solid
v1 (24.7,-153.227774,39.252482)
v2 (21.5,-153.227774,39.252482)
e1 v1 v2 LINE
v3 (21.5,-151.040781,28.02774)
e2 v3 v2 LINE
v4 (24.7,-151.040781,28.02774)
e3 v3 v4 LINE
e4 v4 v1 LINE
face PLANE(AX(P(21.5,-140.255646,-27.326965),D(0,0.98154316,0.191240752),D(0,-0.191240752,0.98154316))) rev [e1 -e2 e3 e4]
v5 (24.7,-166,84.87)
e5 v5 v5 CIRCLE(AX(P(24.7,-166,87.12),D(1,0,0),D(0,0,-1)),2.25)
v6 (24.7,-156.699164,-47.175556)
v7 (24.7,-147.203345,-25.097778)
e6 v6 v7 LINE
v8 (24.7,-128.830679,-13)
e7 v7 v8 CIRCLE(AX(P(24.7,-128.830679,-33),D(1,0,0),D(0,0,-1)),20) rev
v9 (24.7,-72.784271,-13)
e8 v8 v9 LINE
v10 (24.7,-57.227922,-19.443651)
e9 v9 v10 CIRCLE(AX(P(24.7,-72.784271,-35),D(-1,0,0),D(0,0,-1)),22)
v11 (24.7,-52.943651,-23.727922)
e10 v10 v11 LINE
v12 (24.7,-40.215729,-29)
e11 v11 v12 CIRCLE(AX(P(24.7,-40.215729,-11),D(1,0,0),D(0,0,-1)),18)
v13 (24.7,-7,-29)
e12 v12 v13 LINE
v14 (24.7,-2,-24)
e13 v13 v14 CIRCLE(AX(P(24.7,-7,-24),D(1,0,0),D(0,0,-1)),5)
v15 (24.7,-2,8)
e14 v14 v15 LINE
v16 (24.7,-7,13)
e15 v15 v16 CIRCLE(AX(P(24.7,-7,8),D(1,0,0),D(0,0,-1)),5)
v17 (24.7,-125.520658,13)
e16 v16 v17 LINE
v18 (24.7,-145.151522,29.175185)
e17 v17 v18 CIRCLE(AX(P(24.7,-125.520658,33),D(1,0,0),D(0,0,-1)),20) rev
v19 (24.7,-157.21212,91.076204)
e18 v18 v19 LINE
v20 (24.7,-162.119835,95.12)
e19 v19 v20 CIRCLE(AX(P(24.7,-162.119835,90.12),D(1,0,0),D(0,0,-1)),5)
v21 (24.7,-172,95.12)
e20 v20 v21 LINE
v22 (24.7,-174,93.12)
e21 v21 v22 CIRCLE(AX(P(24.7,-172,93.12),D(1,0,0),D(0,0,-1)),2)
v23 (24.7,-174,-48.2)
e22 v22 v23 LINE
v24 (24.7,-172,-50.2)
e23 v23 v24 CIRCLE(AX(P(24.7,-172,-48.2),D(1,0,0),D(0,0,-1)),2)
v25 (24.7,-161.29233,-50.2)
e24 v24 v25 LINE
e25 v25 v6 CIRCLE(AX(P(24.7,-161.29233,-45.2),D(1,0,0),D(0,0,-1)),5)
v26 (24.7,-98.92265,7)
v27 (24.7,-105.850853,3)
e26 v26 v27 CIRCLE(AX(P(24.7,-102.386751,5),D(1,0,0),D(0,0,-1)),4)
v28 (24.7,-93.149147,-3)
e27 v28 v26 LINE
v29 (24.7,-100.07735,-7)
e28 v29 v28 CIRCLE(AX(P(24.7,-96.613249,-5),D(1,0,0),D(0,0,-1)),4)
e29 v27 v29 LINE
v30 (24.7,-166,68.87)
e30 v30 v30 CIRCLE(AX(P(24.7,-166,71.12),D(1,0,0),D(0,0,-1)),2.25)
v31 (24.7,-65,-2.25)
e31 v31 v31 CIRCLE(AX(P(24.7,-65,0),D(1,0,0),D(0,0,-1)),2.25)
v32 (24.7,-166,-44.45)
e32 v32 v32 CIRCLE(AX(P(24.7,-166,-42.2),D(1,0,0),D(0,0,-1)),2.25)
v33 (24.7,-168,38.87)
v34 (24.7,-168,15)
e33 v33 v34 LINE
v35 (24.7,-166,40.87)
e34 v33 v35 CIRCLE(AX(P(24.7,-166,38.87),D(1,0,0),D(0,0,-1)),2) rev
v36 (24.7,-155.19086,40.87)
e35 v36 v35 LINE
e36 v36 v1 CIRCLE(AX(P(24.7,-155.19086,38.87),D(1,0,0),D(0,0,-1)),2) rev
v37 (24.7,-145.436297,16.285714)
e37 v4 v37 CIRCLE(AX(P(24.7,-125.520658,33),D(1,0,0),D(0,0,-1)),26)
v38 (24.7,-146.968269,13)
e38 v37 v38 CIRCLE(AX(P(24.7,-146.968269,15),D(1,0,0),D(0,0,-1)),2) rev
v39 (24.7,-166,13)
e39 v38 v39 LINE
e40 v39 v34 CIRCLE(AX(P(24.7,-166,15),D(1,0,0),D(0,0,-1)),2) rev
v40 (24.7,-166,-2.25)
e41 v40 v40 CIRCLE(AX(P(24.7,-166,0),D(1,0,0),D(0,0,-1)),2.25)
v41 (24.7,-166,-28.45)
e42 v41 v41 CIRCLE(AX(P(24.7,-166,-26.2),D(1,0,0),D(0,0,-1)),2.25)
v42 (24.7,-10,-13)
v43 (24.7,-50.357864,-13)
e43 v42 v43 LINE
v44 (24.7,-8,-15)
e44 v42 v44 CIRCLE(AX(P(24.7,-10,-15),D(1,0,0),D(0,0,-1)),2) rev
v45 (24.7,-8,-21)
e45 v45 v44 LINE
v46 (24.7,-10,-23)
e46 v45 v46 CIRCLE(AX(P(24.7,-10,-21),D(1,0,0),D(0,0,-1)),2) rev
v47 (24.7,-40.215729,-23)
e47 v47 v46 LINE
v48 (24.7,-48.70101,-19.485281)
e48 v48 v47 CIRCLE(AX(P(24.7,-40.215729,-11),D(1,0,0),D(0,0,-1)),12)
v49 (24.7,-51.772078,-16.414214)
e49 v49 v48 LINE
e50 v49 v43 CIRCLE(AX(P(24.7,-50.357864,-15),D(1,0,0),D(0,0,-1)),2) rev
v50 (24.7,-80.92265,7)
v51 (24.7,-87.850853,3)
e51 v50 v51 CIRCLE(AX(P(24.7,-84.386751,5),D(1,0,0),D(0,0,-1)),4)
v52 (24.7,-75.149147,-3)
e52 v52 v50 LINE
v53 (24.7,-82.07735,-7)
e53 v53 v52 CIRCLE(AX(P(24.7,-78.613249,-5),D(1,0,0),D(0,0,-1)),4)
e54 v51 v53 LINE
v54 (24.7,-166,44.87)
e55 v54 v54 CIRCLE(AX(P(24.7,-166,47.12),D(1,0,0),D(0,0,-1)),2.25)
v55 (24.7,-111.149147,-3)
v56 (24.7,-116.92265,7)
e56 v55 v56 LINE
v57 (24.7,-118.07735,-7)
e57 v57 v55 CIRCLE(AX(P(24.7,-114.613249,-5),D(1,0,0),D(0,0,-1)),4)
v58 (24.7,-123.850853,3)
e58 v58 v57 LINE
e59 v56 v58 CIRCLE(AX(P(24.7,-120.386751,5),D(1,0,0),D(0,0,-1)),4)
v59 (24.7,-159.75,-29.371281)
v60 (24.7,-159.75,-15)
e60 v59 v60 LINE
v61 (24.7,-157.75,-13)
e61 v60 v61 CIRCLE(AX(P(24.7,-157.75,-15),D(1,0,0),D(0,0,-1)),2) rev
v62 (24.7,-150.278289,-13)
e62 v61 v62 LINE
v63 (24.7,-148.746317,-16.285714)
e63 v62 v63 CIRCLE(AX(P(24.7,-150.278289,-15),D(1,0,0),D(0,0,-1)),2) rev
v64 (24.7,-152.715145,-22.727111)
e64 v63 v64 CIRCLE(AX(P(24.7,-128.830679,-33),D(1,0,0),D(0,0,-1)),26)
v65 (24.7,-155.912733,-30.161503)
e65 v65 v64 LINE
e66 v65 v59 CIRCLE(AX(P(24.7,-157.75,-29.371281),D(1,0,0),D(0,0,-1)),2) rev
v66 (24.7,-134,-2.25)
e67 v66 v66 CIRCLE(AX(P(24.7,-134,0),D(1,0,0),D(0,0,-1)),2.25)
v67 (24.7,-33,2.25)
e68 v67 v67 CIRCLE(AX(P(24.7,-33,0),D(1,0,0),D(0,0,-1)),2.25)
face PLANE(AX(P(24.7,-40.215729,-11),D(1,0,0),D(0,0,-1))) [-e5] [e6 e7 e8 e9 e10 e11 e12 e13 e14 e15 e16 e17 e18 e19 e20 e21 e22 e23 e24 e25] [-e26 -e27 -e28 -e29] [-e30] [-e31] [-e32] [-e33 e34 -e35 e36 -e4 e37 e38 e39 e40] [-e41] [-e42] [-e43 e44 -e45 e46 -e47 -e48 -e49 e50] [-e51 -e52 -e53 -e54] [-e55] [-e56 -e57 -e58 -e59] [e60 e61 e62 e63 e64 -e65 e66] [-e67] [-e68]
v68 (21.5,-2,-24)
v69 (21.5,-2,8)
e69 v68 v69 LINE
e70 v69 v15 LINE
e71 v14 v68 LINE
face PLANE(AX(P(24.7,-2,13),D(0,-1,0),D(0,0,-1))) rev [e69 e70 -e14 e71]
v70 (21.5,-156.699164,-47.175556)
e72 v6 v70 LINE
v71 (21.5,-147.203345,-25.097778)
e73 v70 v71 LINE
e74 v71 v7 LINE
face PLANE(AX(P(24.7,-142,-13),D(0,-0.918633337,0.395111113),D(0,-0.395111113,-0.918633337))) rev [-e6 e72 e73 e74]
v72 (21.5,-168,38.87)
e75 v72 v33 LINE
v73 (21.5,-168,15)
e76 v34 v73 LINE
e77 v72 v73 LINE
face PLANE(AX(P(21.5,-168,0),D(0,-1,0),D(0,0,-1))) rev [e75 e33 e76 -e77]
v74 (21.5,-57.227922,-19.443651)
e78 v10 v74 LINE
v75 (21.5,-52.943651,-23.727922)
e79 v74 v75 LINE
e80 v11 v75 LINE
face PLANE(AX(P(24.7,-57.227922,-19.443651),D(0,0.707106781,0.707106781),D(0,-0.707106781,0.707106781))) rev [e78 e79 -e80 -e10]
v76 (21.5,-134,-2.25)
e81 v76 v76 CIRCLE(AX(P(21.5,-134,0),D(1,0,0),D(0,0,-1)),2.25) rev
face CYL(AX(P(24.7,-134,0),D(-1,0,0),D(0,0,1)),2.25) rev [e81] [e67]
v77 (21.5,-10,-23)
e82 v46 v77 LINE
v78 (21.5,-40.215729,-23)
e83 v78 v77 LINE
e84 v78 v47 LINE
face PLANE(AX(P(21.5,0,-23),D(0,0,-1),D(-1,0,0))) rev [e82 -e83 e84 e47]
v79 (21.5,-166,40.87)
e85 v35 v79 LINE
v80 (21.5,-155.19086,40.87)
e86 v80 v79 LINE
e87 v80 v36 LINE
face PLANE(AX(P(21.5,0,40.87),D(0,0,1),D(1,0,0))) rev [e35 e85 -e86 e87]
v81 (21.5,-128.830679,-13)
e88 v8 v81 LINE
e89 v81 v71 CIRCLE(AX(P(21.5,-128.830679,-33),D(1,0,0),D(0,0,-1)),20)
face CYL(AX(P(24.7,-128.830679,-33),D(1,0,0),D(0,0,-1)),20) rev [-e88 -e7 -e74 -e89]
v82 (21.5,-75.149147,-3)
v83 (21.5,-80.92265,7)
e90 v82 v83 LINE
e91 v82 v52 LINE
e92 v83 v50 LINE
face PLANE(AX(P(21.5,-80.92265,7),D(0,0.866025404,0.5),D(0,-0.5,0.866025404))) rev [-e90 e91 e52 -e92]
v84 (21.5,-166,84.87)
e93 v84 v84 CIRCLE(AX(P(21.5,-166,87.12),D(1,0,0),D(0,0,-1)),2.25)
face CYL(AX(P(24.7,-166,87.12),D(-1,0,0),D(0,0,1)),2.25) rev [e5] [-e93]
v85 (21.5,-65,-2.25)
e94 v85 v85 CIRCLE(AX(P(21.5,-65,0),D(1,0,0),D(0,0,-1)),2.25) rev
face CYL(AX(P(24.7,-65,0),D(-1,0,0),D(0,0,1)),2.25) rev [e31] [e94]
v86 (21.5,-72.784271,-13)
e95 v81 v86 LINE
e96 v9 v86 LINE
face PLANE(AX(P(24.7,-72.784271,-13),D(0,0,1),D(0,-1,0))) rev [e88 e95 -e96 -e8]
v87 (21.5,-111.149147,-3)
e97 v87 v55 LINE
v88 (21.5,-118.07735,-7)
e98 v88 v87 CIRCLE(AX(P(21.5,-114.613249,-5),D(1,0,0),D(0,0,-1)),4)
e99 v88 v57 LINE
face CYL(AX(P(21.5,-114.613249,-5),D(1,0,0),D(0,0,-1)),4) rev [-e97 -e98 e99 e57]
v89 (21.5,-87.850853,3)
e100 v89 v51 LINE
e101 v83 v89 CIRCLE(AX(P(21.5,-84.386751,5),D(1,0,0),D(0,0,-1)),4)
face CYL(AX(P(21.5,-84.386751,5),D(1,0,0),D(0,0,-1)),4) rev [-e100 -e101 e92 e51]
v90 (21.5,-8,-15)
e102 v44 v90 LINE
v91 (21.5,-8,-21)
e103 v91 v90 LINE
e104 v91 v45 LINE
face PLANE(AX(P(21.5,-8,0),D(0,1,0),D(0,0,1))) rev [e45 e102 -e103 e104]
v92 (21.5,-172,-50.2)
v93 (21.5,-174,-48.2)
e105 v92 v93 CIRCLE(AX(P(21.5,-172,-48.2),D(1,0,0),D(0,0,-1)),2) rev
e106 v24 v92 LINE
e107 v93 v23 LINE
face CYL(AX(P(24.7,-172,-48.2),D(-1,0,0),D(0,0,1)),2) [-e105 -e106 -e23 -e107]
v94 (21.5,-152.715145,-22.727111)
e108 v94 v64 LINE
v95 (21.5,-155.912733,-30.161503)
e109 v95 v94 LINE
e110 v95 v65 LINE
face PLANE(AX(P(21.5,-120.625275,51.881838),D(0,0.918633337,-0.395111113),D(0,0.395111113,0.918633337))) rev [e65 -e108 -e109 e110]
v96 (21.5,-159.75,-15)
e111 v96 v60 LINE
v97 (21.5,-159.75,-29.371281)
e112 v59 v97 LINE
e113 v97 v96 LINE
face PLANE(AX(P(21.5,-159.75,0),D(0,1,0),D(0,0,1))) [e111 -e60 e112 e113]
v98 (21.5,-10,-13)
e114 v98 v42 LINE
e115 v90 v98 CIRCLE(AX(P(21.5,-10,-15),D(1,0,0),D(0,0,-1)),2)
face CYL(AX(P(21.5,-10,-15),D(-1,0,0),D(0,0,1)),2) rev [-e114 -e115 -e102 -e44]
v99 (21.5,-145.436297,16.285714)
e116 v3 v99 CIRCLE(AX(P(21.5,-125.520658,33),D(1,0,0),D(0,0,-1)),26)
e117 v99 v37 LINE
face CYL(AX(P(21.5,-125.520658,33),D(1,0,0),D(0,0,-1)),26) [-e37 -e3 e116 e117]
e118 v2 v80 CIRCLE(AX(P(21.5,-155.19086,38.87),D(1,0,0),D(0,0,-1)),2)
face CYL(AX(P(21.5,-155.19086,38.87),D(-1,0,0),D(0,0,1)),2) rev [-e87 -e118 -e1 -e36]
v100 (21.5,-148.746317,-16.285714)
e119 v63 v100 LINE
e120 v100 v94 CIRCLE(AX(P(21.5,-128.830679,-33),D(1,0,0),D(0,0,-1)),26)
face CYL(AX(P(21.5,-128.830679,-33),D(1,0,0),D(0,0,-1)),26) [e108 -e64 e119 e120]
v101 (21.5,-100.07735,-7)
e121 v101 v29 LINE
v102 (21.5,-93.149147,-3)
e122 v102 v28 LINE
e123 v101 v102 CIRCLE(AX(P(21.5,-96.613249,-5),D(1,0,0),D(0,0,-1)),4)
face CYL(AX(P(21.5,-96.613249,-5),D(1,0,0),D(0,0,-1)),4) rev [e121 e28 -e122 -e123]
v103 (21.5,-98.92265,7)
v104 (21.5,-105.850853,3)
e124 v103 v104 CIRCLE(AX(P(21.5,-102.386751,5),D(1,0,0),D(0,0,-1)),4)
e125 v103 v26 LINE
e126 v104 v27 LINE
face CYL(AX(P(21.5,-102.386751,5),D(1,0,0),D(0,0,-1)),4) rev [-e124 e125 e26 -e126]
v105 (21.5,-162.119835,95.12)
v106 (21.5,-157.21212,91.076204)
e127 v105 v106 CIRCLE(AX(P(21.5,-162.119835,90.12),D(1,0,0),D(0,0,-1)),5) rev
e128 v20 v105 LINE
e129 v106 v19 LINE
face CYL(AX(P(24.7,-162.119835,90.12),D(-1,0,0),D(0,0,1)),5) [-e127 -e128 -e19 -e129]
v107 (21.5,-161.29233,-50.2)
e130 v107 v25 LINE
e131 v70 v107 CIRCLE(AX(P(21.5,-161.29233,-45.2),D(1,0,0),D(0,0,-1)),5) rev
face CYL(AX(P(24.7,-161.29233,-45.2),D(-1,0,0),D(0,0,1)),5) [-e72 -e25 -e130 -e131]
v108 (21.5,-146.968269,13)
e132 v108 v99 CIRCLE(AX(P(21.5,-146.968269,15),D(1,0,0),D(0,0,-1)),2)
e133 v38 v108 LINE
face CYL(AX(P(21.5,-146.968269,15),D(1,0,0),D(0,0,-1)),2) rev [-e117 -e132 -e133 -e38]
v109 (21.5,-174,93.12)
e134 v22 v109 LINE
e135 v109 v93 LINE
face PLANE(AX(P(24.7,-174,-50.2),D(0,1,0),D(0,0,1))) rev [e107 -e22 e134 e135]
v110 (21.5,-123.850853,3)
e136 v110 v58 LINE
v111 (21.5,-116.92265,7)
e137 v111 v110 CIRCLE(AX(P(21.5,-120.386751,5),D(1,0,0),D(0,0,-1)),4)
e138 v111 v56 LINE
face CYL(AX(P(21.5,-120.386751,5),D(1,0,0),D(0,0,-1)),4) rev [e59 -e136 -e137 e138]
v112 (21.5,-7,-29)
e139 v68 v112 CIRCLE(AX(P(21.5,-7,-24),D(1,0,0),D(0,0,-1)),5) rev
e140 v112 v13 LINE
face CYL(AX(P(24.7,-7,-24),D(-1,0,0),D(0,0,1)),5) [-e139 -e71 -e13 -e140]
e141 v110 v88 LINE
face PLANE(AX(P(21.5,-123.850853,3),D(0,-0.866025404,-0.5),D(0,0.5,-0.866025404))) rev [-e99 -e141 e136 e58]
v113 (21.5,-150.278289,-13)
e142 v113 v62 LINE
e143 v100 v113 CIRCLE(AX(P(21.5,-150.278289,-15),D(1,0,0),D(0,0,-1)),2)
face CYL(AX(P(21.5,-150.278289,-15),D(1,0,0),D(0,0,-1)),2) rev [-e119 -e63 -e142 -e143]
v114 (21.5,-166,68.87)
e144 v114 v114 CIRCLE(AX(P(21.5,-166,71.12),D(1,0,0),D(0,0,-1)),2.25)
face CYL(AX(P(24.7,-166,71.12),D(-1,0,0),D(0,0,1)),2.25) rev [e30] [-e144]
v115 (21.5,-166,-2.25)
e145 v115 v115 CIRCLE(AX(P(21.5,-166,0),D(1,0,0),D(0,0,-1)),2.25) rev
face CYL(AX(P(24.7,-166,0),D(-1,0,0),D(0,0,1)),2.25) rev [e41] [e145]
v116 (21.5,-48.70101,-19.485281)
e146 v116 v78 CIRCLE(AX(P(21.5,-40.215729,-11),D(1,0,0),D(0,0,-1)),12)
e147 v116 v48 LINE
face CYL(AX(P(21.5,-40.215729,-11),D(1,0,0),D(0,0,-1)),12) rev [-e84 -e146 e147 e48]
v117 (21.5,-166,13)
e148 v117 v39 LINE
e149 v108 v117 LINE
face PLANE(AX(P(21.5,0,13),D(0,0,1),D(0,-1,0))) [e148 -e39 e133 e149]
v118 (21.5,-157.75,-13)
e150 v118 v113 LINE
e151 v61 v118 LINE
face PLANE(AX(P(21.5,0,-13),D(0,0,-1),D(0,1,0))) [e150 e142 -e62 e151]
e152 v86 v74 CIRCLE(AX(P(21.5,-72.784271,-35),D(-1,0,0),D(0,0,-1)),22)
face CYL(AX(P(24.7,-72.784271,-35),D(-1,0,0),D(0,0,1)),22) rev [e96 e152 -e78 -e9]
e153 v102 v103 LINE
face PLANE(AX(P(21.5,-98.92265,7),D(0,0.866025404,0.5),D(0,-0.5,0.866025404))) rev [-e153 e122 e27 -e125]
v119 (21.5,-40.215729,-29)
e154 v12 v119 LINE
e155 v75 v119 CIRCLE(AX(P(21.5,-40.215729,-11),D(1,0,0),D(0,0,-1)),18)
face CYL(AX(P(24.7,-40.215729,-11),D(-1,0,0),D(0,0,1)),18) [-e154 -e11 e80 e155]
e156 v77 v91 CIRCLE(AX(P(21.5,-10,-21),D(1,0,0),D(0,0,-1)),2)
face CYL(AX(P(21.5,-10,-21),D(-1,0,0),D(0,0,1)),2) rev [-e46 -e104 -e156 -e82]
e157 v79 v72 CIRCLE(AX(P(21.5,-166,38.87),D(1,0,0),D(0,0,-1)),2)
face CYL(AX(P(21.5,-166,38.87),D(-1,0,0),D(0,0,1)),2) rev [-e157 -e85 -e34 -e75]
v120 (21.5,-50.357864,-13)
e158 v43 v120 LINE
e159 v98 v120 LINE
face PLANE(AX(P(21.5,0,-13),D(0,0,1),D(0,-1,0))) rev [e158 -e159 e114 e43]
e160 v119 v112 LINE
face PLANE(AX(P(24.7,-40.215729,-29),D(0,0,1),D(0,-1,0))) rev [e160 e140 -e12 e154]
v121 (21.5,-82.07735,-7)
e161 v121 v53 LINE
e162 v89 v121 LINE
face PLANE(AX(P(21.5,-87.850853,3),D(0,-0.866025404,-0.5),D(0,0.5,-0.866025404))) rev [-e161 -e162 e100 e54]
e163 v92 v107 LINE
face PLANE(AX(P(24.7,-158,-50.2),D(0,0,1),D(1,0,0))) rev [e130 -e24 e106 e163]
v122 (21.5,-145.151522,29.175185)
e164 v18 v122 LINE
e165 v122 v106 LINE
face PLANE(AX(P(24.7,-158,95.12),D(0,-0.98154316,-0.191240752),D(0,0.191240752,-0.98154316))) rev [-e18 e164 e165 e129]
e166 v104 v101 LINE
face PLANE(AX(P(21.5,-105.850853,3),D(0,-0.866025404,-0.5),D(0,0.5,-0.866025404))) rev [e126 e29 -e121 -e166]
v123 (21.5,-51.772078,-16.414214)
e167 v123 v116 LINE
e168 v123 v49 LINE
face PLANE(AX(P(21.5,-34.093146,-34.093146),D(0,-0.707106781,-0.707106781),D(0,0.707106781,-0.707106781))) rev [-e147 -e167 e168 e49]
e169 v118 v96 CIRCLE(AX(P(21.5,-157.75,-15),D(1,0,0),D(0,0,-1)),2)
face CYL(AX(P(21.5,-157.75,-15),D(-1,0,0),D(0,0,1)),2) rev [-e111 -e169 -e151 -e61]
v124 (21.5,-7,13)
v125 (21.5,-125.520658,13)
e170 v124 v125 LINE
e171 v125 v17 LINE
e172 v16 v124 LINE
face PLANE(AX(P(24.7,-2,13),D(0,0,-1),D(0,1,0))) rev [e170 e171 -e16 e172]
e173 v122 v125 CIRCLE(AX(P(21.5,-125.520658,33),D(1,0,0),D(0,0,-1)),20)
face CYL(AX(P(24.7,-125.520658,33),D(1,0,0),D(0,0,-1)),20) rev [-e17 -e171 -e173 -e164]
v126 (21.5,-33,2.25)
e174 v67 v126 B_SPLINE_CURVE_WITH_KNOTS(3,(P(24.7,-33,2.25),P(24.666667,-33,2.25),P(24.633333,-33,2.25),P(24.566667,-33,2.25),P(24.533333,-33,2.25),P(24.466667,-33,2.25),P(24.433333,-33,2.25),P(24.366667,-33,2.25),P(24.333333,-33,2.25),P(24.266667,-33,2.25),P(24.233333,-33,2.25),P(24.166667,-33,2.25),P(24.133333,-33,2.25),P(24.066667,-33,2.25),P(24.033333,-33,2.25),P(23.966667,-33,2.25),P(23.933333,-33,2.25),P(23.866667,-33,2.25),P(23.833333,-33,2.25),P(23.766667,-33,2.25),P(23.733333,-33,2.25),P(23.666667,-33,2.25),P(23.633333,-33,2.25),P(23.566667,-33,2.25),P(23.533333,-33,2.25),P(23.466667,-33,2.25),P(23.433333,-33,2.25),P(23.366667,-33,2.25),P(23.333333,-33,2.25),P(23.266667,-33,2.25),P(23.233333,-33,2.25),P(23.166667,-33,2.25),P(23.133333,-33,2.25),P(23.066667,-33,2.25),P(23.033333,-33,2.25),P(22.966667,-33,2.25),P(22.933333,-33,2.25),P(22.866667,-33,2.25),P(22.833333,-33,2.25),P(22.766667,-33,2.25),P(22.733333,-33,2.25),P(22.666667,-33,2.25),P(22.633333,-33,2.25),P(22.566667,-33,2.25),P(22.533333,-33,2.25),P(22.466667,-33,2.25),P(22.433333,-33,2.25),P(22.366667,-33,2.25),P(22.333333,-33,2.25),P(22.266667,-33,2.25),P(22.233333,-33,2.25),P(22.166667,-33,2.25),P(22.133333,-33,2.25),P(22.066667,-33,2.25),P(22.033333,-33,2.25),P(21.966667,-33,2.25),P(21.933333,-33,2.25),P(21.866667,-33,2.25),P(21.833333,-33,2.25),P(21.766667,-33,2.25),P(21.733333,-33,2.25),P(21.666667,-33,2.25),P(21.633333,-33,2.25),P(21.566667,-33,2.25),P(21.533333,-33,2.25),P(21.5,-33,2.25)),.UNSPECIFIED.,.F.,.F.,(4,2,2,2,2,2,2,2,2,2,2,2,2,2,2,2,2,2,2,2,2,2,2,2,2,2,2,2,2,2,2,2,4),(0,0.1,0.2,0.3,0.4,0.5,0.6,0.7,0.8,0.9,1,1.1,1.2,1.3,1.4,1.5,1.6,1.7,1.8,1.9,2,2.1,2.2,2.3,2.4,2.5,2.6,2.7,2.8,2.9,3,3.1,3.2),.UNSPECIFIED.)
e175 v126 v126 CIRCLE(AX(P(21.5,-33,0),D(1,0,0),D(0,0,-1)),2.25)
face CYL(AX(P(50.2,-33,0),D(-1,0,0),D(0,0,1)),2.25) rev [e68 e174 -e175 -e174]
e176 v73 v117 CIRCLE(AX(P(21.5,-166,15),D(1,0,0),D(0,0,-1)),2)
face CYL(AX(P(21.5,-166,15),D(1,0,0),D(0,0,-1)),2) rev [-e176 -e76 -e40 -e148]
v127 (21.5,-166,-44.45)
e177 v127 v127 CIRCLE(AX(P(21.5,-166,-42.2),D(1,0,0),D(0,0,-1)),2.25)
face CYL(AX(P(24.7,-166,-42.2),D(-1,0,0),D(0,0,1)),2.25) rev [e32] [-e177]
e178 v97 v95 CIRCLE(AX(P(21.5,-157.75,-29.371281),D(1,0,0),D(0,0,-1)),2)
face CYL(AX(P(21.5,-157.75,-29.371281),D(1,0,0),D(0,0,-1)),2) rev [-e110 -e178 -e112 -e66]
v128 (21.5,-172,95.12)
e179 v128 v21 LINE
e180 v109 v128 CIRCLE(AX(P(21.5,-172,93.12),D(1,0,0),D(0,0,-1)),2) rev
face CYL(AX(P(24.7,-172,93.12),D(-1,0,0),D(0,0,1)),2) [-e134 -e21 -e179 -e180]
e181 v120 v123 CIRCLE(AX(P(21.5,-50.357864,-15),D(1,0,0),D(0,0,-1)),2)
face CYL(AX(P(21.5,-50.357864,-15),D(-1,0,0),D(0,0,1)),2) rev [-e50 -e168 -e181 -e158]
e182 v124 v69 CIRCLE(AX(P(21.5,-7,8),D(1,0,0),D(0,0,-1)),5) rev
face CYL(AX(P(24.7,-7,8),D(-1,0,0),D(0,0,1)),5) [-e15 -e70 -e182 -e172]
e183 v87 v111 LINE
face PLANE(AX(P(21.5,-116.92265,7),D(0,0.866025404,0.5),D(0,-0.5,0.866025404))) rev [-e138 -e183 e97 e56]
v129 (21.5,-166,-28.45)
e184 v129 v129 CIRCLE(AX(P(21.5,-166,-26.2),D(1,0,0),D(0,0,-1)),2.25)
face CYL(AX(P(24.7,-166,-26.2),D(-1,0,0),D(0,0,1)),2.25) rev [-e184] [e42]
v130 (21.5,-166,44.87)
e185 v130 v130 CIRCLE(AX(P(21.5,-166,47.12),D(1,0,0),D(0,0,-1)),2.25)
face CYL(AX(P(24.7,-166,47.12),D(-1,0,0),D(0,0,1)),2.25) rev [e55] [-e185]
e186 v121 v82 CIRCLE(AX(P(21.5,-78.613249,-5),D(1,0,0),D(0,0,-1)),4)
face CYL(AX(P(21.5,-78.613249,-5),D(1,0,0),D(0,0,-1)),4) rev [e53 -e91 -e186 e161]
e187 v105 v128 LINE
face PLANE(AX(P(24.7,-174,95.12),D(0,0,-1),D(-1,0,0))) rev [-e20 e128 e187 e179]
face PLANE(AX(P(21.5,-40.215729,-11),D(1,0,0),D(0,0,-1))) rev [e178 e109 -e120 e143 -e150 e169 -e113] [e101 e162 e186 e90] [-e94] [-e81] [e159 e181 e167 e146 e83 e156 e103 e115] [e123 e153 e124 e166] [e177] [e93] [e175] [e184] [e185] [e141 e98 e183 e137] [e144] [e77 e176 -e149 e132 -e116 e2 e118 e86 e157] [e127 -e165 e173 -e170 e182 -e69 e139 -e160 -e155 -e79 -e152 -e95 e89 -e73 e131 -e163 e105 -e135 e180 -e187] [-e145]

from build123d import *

# Parameters (mm, degrees)
STOCK_SPINE_MASTER_1_START     = 21.5
STOCK_SPINE_MASTER_1_OUTLINE_R = 2.25
STOCK_SPINE_MASTER_1_DEPTH     = 3.2
FILLET1_R                      = 5
FILLET2_R                      = 2
FILLET3_R                      = 20
CUT_EXTRUDE4_DEPTH             = 199.32814828
FILLET4_R                      = 2
CUT_EXTRUDE6_DEPTH             = 199.328148417
LPATTERN2_COUNT                = 2
LPATTERN2_PITCH                = 18
LPATTERN2_COL_COUNT            = 2
LPATTERN2_COL_PITCH            = 18


# Read off the part's stored shape, not the designer's step: Stock-spine_master-1
with BuildPart() as part:
    # Stock-spine_master-1 outline → Stock-spine_master-1 (new body)
    with BuildSketch(Plane.YZ.offset(STOCK_SPINE_MASTER_1_START)):
        with BuildLine():
            Line((-174, -50.2), (-158, -50.2))
            Line((-158, -50.2), (-142, -13))
            Line((-142, -13), (-72.784271247, -13))
            ThreePointArc((-72.784271247, -13), (-64.365235735, -14.674650285), (-57.227922061, -19.443650814))
            Line((-57.227922061, -19.443650814), (-52.943650814, -23.727922061))
            ThreePointArc((-52.943650814, -23.727922061), (-47.104030535, -27.629831585), (-40.215728753, -29))
            Line((-40.215728753, -29), (-2, -29))
            Line((-2, -29), (-2, 13))
            Line((-2, 13), (-142, 13))
            Line((-142, 13), (-158, 95.12))
            Line((-158, 95.12), (-174, 95.12))
            Line((-174, 95.12), (-174, -50.2))
        make_face()
        with Locations((-166, -42.2)):
            Circle(STOCK_SPINE_MASTER_1_OUTLINE_R, mode=Mode.SUBTRACT)
        with Locations((-166, -26.2)):
            Circle(STOCK_SPINE_MASTER_1_OUTLINE_R, mode=Mode.SUBTRACT)
        with Locations((-166, 0)):
            Circle(STOCK_SPINE_MASTER_1_OUTLINE_R, mode=Mode.SUBTRACT)
        with Locations((-134, 0)):
            Circle(STOCK_SPINE_MASTER_1_OUTLINE_R, mode=Mode.SUBTRACT)
        with Locations((-65, 0)):
            Circle(STOCK_SPINE_MASTER_1_OUTLINE_R, mode=Mode.SUBTRACT)
        with Locations((-33, 0)):
            Circle(STOCK_SPINE_MASTER_1_OUTLINE_R, mode=Mode.SUBTRACT)
        with Locations((-166, 47.12)):
            Circle(STOCK_SPINE_MASTER_1_OUTLINE_R, mode=Mode.SUBTRACT)
        with Locations((-166, 71.12)):
            Circle(STOCK_SPINE_MASTER_1_OUTLINE_R, mode=Mode.SUBTRACT)
        with Locations((-166, 87.12)):
            Circle(STOCK_SPINE_MASTER_1_OUTLINE_R, mode=Mode.SUBTRACT)
    extrude(amount=STOCK_SPINE_MASTER_1_DEPTH)

    # Fillet1
    fillet1_edges = [part.edges().sort_by_distance(p)[0] for p in [
        (23.1, -158, 95.12),
        (23.1, -2, 13),
        (23.1, -2, -29),
        (23.1, -158, -50.2),
    ]]
    fillet(fillet1_edges, radius=FILLET1_R)

    # Fillet2
    fillet2_edges = [part.edges().sort_by_distance(p)[0] for p in [
        (23.1, -174, -50.2),
        (23.1, -174, 95.12),
    ]]
    fillet(fillet2_edges, radius=FILLET2_R)

    # Fillet3
    fillet3_edges = [part.edges().sort_by_distance(p)[0] for p in [
        (23.1, -142, 13),
        (23.1, -142, -13),
    ]]
    fillet(fillet3_edges, radius=FILLET3_R)

    # Sketch7 → Cut-Extrude4 (cut, through all)
    with BuildSketch(Plane(origin=(24.7, 0, 0), x_dir=(0, 0, -1), z_dir=(1, 0, 0))):
        with BuildLine():
            Line((-28.027740447, -151.040780627), (-40.87, -153.542925693))
            Line((-40.87, -153.542925693), (-40.87, -168))
            Line((-40.87, -168), (-13, -168))
            Line((-13, -168), (-13, -142.133906195))
            ThreePointArc((-13, -142.133906195), (-19.743434086, -147.887228617), (-28.027740447, -151.040780627))
        make_face()
        with BuildLine():
            Line((23, -8), (13, -8))
            Line((13, -8), (13, -55.463763172))
            ThreePointArc((13, -55.463763172), (14.063796748, -54.191923537), (15.201010127, -52.985281374))
            Line((15.201010127, -52.985281374), (19.485281374, -48.701010127))
            ThreePointArc((19.485281374, -48.701010127), (22.08655439, -44.807929941), (23, -40.215728753))
            Line((23, -40.215728753), (23, -8))
        make_face()
        with BuildLine():
            Line((13, -145.443926245), (13, -159.75))
            Line((13, -159.75), (39.083148267, -159.75))
            Line((39.083148267, -159.75), (22.727111066, -152.71514529))
            ThreePointArc((22.727111066, -152.71514529), (17.433060426, -149.655432834), (13, -145.443926245))
        make_face()
    extrude(amount=-CUT_EXTRUDE4_DEPTH, mode=Mode.SUBTRACT)

    # Fillet4
    fillet4_edges = [part.edges().sort_by_distance(p)[0] for p in [
        (23.1, -168, 13),
        (23.1, -168, 40.87),
        (23.1, -153.542925693, 40.87),
        (23.1, -142.133906195, 13),
        (23.1, -55.463763172, -13),
        (23.1, -145.443926245, -13),
        (23.1, -8, -13),
        (23.1, -159.75, -13),
        (23.1, -159.75, -39.083148267),
        (23.1, -8, -23),
    ]]
    fillet(fillet4_edges, radius=FILLET4_R)

    # Sketch10 → Cut-Extrude6 (cut, through all)
    with BuildSketch(Plane(origin=(24.7, 0, 0), x_dir=(0, 0, -1), z_dir=(1, 0, 0))):
        with BuildLine():
            Line((-7, -98.922649731), (3, -93.149147039))
            ThreePointArc((3, -93.149147039), (8.464101615, -94.613248654), (7, -100.077350269))
            Line((7, -100.077350269), (-3, -105.850852961))
            ThreePointArc((-3, -105.850852961), (-8.464101615, -104.386751346), (-7, -98.922649731))
        make_face()
    cut_extrude6 = extrude(amount=-CUT_EXTRUDE6_DEPTH, mode=Mode.SUBTRACT)

    # LPattern2: Cut-Extrude6 ×2
    with Locations(*[(0, i * LPATTERN2_PITCH, 0) for i in range(1, LPATTERN2_COUNT)]):
        add(cut_extrude6, mode=Mode.SUBTRACT)

    # LPattern2 col: Cut-Extrude6 ×2
    with Locations(*[(0, -i * LPATTERN2_COL_PITCH, 0) for i in range(1, LPATTERN2_COL_COUNT)]):
        add(cut_extrude6, mode=Mode.SUBTRACT)


solid = part.part
